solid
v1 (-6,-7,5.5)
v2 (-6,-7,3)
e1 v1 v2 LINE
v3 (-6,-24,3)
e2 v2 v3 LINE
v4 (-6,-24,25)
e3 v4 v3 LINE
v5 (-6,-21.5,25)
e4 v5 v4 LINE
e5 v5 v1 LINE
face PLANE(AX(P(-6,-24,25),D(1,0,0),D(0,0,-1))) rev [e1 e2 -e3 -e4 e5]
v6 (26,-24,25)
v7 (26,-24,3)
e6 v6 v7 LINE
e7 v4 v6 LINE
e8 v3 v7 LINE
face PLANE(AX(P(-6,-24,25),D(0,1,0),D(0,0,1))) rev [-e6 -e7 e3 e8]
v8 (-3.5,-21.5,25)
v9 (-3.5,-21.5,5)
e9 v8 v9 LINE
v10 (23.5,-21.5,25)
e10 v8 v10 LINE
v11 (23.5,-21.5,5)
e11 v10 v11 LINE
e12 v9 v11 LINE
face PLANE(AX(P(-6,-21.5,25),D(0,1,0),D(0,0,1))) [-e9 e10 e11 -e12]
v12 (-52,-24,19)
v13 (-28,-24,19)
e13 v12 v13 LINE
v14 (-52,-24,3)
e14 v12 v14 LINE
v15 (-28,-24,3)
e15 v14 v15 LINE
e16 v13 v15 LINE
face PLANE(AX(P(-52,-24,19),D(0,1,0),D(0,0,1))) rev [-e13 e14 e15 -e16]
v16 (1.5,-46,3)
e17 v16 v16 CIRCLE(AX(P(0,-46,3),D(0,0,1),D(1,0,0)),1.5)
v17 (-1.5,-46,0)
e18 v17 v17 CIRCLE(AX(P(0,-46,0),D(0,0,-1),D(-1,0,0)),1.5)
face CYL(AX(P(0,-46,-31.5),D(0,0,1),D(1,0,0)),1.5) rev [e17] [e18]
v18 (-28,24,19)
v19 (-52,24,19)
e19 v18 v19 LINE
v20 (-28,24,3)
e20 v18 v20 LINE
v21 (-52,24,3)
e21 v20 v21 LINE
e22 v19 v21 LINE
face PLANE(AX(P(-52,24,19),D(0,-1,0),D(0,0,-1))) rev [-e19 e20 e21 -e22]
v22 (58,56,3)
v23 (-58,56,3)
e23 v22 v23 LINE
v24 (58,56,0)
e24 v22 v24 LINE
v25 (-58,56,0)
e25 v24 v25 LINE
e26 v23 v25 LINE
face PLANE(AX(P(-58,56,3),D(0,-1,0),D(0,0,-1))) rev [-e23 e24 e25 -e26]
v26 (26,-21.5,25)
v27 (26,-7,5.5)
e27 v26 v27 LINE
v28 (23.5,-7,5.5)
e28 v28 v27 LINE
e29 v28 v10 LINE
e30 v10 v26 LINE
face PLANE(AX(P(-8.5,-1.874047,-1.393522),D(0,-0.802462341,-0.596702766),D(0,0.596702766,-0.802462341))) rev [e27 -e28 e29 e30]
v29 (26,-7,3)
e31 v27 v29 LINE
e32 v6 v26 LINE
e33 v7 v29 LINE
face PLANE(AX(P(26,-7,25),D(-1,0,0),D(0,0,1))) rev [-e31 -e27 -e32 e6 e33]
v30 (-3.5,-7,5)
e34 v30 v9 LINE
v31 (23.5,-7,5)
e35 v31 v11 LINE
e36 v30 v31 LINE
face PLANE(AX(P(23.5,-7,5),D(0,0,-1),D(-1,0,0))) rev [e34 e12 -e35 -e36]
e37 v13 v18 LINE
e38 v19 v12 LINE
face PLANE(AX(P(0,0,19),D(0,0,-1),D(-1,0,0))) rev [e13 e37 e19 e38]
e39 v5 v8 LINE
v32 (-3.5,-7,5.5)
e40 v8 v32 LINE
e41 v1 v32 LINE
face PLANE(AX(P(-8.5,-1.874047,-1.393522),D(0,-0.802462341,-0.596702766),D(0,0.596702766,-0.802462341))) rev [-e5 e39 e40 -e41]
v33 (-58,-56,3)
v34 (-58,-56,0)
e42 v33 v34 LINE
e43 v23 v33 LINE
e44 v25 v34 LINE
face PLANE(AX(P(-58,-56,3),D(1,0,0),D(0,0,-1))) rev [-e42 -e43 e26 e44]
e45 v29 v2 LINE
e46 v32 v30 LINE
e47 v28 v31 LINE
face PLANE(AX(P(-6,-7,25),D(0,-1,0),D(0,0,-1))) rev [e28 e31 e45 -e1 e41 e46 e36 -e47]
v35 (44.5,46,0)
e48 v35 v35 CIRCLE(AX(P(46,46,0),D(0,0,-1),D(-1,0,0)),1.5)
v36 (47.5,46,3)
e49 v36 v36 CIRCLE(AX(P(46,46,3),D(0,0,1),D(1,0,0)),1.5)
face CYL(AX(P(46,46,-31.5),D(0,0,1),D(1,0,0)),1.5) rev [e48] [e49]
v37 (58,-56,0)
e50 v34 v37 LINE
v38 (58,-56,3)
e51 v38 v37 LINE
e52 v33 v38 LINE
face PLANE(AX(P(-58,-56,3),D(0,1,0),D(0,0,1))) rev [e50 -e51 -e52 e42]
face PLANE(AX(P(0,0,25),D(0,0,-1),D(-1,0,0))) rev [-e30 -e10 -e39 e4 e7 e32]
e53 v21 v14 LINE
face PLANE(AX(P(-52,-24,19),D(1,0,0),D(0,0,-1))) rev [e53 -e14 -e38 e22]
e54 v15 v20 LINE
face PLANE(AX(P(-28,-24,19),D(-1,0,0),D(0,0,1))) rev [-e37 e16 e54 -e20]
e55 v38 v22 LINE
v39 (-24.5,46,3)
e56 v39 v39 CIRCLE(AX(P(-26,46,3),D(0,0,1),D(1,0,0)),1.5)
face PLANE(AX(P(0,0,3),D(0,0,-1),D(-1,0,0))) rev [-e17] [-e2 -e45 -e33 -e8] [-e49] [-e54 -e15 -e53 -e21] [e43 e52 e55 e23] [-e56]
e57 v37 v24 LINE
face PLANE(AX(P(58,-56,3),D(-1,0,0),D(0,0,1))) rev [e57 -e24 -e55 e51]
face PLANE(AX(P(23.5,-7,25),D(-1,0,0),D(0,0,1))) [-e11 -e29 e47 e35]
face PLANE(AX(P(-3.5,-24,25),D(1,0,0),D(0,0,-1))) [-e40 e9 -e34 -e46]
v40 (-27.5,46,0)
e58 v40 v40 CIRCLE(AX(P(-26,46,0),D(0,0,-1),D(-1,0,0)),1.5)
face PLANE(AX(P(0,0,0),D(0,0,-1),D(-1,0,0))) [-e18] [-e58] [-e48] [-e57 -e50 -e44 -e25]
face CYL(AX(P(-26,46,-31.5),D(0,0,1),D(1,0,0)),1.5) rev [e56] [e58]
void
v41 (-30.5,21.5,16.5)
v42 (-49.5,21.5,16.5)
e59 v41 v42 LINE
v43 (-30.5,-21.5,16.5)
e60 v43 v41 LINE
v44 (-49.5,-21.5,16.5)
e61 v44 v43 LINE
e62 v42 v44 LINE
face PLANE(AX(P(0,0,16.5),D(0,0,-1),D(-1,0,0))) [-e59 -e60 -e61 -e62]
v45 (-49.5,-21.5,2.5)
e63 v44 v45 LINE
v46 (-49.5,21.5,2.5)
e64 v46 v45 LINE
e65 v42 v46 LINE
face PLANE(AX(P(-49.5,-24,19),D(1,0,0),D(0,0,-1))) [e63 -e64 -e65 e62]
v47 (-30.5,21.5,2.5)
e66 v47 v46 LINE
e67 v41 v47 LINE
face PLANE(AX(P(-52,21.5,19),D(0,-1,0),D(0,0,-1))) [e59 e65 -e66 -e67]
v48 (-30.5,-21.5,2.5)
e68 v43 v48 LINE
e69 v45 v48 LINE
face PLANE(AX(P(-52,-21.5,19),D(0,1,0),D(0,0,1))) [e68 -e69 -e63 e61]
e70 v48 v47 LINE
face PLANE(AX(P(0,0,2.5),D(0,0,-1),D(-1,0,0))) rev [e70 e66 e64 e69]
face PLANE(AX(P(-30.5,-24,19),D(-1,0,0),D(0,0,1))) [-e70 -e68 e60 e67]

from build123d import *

# Parameters (mm, degrees)
CROQUIS1_W              = 116
CROQUIS1_H              = 112
SALIENTE_EXTRUIR1_DEPTH = 3
CROQUIS2_W              = 24
CROQUIS2_H              = 48
SALIENTE_EXTRUIR2_DEPTH = 16
CROQUIS3_W              = 32
CROQUIS3_H              = 17
SALIENTE_EXTRUIR3_DEPTH = 22
VACIADO1_START          = -21.5
VACIADO1_OUTLINE_W      = 27
VACIADO1_OUTLINE_H      = 22.5
VACIADO1_OUTLINE_W_2    = 19
VACIADO1_OUTLINE_H_2    = 14
VACIADO1_DEPTH          = 14.5
VACIADO1_START_2        = -7
VACIADO1_2_OUTLINE_W    = 19
VACIADO1_2_OUTLINE_H    = 14
VACIADO1_2_DEPTH        = 28.5
CROQUIS5_W              = 27
CROQUIS5_H              = 2.5
SALIENTE_EXTRUIR7_DEPTH = 14.5
CORTAR_EXTRUIR1_DEPTH   = 34.5
CROQUIS7_R              = 1.5
CORTAR_EXTRUIR2_DEPTH   = 34.5


# Read off the part's stored shape, not the designer's step: Vaciado1
with BuildPart() as part:
    # Croquis1 → Saliente-Extruir1 (new body)
    with BuildSketch(Plane.XY):
        Rectangle(CROQUIS1_W, CROQUIS1_H)
    extrude(amount=SALIENTE_EXTRUIR1_DEPTH)

    # Croquis2 → Saliente-Extruir2 (add)
    with BuildSketch(Plane.XY.offset(3)):
        with Locations((-40, 0)):
            Rectangle(CROQUIS2_W, CROQUIS2_H)
    extrude(amount=SALIENTE_EXTRUIR2_DEPTH)

    # Croquis3 → Saliente-Extruir3 (add)
    with BuildSketch(Plane.XY.offset(3)):
        with Locations((10, -15.5)):
            Rectangle(CROQUIS3_W, CROQUIS3_H)
    extrude(amount=SALIENTE_EXTRUIR3_DEPTH)

    # Vaciado1 outline → Vaciado1 (cut)
    with BuildSketch(Plane(origin=(0, 0, 0), x_dir=(1, 0, 0), z_dir=(0, 1, 0)).offset(VACIADO1_START)):
        with Locations((10, -13.75)):
            Rectangle(VACIADO1_OUTLINE_W, VACIADO1_OUTLINE_H)
        with Locations((-40, -9.5)):
            Rectangle(VACIADO1_OUTLINE_W_2, VACIADO1_OUTLINE_H_2)
    extrude(amount=VACIADO1_DEPTH, mode=Mode.SUBTRACT)

    # Vaciado1 2 outline → Vaciado1 2 (cut)
    with BuildSketch(Plane(origin=(0, 0, 0), x_dir=(1, 0, 0), z_dir=(0, 1, 0)).offset(VACIADO1_START_2)):
        with Locations((-40, -9.5)):
            Rectangle(VACIADO1_2_OUTLINE_W, VACIADO1_2_OUTLINE_H)
    extrude(amount=VACIADO1_2_DEPTH, mode=Mode.SUBTRACT)

    # Croquis5 → Saliente-Extruir7 (add)
    with BuildSketch(Plane(origin=(0, -21.5, 0), x_dir=(1, 0, 0), z_dir=(0, 1, 0))):
        with Locations((10, -3.75)):
            Rectangle(CROQUIS5_W, CROQUIS5_H)
    extrude(amount=SALIENTE_EXTRUIR7_DEPTH)

    # Croquis6 → Cortar-Extruir1 (cut)
    with BuildSketch(Plane(origin=(26, 0, 0), x_dir=(0, 0, -1), z_dir=(1, 0, 0))):
        Polygon((-25, -7), (-25, -21.5), (-5.5, -7), align=None)
    extrude(amount=-CORTAR_EXTRUIR1_DEPTH, mode=Mode.SUBTRACT)

    # Croquis7 → Cortar-Extruir2 (cut)
    with BuildSketch(Plane.XY.offset(3)):
        with Locations((-26, 46)):
            Circle(CROQUIS7_R)
        with Locations((46, 46)):
            Circle(CROQUIS7_R)
        with Locations((0, -46)):
            Circle(CROQUIS7_R)
    extrude(amount=-CORTAR_EXTRUIR2_DEPTH, mode=Mode.SUBTRACT)


solid = part.part
